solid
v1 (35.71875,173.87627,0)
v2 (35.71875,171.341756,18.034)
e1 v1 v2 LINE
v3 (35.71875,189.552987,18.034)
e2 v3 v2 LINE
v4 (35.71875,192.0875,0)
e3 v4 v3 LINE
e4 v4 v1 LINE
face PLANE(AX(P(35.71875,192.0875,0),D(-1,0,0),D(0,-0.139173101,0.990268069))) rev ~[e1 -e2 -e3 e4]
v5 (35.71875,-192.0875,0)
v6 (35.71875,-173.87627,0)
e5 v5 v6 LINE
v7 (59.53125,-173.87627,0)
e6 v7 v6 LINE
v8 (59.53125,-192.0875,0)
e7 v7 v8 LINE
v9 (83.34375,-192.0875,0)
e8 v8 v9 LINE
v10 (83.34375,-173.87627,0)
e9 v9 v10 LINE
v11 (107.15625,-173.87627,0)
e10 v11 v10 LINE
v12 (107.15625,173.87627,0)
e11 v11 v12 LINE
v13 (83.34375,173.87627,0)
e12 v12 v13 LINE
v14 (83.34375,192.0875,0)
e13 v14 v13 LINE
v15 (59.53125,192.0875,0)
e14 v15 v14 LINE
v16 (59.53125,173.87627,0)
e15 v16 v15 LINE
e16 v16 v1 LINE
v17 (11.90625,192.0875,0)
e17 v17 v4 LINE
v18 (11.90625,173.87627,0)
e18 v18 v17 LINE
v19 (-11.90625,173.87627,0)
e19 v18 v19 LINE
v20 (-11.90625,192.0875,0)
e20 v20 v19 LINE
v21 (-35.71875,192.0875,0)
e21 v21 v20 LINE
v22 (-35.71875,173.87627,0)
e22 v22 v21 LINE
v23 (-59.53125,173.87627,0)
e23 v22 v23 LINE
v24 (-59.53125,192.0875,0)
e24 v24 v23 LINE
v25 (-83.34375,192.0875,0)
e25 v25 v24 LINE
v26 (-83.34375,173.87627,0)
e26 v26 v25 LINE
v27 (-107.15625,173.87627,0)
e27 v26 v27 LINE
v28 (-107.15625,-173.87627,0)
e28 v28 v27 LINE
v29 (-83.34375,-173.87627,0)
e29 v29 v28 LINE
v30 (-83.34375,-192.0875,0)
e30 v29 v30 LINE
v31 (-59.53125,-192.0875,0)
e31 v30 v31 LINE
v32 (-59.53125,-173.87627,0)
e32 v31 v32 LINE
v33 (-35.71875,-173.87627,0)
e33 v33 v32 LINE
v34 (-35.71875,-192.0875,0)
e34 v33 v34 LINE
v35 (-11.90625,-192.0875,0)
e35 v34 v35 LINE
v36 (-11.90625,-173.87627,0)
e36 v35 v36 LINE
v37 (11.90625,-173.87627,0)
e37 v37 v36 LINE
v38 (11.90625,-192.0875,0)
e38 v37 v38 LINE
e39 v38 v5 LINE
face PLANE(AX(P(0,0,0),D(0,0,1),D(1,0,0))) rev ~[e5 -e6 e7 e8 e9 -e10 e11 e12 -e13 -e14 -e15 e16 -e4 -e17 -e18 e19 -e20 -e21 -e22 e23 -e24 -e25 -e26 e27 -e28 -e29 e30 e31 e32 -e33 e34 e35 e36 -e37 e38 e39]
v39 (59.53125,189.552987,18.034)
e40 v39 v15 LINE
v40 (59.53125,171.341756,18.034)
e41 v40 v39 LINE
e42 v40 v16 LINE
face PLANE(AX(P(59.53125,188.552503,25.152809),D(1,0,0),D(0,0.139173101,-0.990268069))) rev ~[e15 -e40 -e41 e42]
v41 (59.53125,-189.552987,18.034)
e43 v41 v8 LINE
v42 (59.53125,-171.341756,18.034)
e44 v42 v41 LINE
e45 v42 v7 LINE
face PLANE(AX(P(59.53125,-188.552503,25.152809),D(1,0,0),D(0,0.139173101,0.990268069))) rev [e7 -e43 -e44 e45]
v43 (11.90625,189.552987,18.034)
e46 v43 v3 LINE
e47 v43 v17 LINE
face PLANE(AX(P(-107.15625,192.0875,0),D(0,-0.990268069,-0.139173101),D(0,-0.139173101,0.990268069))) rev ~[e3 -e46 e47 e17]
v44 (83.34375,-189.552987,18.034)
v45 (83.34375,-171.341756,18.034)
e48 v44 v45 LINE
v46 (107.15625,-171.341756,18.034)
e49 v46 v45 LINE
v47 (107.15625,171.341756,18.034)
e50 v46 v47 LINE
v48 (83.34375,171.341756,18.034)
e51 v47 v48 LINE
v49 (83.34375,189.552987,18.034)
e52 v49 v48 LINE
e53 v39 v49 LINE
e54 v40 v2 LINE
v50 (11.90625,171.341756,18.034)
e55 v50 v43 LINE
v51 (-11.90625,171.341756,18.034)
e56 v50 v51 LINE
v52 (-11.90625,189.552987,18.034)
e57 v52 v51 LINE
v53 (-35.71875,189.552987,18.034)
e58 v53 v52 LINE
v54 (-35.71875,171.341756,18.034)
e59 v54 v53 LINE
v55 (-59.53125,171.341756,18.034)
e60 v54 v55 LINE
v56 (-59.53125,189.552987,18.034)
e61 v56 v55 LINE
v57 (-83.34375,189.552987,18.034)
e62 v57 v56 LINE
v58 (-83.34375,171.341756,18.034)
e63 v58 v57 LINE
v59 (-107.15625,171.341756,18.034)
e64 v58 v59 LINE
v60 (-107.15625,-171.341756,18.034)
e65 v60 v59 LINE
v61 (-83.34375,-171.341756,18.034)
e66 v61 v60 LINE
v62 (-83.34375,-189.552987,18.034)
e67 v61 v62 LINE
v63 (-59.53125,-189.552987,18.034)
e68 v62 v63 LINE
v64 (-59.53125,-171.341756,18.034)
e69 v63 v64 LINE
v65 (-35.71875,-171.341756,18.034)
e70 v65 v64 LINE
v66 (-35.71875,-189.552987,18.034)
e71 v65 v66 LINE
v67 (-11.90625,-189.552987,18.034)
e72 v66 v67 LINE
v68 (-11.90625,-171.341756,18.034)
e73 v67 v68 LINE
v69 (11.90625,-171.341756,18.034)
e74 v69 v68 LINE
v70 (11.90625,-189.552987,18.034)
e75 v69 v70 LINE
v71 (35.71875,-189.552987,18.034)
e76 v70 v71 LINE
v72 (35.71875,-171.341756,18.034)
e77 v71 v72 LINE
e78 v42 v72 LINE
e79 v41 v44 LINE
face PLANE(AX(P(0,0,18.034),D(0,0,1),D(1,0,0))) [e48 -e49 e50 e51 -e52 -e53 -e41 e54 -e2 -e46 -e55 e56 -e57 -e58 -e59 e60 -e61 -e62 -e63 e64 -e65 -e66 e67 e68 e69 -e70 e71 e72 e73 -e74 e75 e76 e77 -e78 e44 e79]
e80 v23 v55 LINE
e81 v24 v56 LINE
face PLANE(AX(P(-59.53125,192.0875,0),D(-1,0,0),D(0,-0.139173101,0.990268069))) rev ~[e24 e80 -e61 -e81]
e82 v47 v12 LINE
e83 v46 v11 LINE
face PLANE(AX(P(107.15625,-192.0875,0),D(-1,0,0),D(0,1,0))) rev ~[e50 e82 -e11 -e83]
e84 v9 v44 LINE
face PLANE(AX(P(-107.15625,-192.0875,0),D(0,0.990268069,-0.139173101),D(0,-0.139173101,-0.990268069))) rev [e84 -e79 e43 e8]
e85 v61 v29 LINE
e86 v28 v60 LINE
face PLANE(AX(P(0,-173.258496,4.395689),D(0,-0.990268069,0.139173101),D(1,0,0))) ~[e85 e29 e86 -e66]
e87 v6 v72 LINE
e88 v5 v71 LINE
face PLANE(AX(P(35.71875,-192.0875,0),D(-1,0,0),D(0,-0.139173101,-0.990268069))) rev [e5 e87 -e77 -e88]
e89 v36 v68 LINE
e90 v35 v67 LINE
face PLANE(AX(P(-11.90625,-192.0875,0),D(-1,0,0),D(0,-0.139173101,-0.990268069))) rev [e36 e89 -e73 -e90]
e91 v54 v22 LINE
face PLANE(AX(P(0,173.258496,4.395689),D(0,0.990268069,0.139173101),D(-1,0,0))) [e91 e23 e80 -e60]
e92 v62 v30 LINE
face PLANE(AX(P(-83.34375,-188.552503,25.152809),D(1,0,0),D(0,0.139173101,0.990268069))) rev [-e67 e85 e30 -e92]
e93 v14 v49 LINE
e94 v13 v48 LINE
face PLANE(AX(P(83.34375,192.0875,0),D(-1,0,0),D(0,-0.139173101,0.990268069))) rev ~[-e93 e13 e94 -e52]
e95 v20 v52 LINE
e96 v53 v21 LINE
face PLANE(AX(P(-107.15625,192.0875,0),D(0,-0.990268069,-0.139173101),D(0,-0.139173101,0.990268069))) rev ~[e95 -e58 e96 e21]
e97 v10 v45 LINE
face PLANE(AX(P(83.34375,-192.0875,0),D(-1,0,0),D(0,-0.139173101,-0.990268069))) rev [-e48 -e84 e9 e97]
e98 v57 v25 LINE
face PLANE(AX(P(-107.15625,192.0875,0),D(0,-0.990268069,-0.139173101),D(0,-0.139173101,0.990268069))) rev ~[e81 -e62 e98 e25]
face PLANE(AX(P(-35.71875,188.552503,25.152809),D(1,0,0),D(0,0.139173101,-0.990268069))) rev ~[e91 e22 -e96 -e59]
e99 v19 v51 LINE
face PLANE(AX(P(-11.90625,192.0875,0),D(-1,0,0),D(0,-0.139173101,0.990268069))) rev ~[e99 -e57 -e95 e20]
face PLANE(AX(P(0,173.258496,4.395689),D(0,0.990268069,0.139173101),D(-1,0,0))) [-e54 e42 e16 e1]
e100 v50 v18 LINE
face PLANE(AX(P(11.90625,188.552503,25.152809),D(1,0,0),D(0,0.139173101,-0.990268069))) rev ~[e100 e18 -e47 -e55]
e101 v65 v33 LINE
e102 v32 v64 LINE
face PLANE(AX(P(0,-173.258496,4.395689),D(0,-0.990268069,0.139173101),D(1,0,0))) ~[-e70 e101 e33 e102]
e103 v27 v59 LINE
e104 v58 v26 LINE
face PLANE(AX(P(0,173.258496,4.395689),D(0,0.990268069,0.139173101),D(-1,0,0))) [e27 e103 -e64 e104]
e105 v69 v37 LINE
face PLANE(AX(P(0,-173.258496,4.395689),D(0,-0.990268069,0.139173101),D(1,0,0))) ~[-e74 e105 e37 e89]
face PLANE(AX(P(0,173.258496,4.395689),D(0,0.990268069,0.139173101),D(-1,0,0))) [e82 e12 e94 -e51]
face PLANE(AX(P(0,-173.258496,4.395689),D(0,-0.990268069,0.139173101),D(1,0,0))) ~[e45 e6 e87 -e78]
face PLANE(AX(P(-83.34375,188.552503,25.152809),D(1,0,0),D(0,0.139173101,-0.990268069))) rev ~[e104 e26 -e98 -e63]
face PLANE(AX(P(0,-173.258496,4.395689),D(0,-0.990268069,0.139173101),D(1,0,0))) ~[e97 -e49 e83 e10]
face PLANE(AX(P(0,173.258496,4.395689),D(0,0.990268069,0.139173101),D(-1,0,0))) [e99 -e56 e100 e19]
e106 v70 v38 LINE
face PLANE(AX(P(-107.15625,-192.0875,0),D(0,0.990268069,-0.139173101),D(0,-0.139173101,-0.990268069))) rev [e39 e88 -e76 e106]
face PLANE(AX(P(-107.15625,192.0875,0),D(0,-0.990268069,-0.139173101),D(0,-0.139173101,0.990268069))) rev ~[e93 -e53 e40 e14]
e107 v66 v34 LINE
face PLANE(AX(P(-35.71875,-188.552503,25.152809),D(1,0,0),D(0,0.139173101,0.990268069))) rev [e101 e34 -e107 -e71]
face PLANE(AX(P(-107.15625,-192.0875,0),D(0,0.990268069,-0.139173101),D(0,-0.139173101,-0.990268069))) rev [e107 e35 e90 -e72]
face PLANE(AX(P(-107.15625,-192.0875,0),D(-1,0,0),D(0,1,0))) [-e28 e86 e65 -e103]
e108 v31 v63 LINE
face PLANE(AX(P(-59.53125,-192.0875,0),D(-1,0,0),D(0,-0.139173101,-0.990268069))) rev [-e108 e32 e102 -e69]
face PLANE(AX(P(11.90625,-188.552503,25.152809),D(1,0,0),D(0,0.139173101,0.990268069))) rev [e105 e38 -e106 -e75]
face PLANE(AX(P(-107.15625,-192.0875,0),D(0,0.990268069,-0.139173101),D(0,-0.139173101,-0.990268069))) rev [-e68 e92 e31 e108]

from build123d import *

# Parameters (mm, degrees)
F0_W     = 214.3125
F0_H     = 384.175
F1_DEPTH = 18.034
F3_DEPTH = 214.3125
F6_DEPTH = 18.034


# Not quite as in the source:
# - a pattern or mirror of a feature is missing from the dataset's text; its kind, count and spacing are read off the source's solid


with BuildPart() as f1:
    # F0 (on Top) → F1 (new body)
    with BuildSketch(Plane.XY):
        Rectangle(F0_W, F0_H)
    extrude(amount=F1_DEPTH)

    # F2 (on face) → F3 (cut, through all)
    with BuildSketch(Plane(origin=(-107.15625, 0, 0), x_dir=(0, -1, 0), z_dir=(-1, 0, 0))):
        Polygon((-204.7875, 0), (-192.0875, 0), (-189.552986587, 18.034), (-204.7875, 18.034), align=None)
    f3 = extrude(amount=-F3_DEPTH, mode=Mode.SUBTRACT)

    # F3_copies: F3 across plane
    add(f3.mirror(Plane(origin=(0, 0, 0), x_dir=(0, 0, -1), z_dir=(0, -1, 0))), mode=Mode.SUBTRACT)

    # F5 (on offset) → F6 (cut)
    with BuildSketch(Plane(origin=(0, 188.3669280093, 26.4732452927), x_dir=(-1, 0, 0), z_dir=(0, 0.9902680687, 0.139173101))):
        Polygon((-83.34375, -1.3334130307), (-107.15625, -1.3334130307), (-107.15625, -26.7334130307), (-107.15625, -33.0834130307), (107.15625, -33.0834130307), (107.15625, -26.7334130307), (107.15625, -1.3334130307), (83.34375, -1.3334130307), (83.34375, -26.7334130307), (59.53125, -26.7334130307), (59.53125, -1.3334130307), (35.71875, -1.3334130307), (35.71875, -26.7334130307), (11.90625, -26.7334130307), (11.90625, -1.3334130307), (-11.90625, -1.3334130307), (-11.90625, -26.7334130307), (-35.71875, -26.7334130307), (-35.71875, -1.3334130307), (-59.53125, -1.3334130307), (-59.53125, -26.7334130307), (-83.34375, -26.7334130307), align=None)
    f6 = extrude(amount=-F6_DEPTH, mode=Mode.SUBTRACT)

    # F6_copies: F6 across plane
    add(f6.mirror(Plane(origin=(0, 0, 0), x_dir=(0, 0, -1), z_dir=(0, -1, 0))), mode=Mode.SUBTRACT)


solid = f1.part
